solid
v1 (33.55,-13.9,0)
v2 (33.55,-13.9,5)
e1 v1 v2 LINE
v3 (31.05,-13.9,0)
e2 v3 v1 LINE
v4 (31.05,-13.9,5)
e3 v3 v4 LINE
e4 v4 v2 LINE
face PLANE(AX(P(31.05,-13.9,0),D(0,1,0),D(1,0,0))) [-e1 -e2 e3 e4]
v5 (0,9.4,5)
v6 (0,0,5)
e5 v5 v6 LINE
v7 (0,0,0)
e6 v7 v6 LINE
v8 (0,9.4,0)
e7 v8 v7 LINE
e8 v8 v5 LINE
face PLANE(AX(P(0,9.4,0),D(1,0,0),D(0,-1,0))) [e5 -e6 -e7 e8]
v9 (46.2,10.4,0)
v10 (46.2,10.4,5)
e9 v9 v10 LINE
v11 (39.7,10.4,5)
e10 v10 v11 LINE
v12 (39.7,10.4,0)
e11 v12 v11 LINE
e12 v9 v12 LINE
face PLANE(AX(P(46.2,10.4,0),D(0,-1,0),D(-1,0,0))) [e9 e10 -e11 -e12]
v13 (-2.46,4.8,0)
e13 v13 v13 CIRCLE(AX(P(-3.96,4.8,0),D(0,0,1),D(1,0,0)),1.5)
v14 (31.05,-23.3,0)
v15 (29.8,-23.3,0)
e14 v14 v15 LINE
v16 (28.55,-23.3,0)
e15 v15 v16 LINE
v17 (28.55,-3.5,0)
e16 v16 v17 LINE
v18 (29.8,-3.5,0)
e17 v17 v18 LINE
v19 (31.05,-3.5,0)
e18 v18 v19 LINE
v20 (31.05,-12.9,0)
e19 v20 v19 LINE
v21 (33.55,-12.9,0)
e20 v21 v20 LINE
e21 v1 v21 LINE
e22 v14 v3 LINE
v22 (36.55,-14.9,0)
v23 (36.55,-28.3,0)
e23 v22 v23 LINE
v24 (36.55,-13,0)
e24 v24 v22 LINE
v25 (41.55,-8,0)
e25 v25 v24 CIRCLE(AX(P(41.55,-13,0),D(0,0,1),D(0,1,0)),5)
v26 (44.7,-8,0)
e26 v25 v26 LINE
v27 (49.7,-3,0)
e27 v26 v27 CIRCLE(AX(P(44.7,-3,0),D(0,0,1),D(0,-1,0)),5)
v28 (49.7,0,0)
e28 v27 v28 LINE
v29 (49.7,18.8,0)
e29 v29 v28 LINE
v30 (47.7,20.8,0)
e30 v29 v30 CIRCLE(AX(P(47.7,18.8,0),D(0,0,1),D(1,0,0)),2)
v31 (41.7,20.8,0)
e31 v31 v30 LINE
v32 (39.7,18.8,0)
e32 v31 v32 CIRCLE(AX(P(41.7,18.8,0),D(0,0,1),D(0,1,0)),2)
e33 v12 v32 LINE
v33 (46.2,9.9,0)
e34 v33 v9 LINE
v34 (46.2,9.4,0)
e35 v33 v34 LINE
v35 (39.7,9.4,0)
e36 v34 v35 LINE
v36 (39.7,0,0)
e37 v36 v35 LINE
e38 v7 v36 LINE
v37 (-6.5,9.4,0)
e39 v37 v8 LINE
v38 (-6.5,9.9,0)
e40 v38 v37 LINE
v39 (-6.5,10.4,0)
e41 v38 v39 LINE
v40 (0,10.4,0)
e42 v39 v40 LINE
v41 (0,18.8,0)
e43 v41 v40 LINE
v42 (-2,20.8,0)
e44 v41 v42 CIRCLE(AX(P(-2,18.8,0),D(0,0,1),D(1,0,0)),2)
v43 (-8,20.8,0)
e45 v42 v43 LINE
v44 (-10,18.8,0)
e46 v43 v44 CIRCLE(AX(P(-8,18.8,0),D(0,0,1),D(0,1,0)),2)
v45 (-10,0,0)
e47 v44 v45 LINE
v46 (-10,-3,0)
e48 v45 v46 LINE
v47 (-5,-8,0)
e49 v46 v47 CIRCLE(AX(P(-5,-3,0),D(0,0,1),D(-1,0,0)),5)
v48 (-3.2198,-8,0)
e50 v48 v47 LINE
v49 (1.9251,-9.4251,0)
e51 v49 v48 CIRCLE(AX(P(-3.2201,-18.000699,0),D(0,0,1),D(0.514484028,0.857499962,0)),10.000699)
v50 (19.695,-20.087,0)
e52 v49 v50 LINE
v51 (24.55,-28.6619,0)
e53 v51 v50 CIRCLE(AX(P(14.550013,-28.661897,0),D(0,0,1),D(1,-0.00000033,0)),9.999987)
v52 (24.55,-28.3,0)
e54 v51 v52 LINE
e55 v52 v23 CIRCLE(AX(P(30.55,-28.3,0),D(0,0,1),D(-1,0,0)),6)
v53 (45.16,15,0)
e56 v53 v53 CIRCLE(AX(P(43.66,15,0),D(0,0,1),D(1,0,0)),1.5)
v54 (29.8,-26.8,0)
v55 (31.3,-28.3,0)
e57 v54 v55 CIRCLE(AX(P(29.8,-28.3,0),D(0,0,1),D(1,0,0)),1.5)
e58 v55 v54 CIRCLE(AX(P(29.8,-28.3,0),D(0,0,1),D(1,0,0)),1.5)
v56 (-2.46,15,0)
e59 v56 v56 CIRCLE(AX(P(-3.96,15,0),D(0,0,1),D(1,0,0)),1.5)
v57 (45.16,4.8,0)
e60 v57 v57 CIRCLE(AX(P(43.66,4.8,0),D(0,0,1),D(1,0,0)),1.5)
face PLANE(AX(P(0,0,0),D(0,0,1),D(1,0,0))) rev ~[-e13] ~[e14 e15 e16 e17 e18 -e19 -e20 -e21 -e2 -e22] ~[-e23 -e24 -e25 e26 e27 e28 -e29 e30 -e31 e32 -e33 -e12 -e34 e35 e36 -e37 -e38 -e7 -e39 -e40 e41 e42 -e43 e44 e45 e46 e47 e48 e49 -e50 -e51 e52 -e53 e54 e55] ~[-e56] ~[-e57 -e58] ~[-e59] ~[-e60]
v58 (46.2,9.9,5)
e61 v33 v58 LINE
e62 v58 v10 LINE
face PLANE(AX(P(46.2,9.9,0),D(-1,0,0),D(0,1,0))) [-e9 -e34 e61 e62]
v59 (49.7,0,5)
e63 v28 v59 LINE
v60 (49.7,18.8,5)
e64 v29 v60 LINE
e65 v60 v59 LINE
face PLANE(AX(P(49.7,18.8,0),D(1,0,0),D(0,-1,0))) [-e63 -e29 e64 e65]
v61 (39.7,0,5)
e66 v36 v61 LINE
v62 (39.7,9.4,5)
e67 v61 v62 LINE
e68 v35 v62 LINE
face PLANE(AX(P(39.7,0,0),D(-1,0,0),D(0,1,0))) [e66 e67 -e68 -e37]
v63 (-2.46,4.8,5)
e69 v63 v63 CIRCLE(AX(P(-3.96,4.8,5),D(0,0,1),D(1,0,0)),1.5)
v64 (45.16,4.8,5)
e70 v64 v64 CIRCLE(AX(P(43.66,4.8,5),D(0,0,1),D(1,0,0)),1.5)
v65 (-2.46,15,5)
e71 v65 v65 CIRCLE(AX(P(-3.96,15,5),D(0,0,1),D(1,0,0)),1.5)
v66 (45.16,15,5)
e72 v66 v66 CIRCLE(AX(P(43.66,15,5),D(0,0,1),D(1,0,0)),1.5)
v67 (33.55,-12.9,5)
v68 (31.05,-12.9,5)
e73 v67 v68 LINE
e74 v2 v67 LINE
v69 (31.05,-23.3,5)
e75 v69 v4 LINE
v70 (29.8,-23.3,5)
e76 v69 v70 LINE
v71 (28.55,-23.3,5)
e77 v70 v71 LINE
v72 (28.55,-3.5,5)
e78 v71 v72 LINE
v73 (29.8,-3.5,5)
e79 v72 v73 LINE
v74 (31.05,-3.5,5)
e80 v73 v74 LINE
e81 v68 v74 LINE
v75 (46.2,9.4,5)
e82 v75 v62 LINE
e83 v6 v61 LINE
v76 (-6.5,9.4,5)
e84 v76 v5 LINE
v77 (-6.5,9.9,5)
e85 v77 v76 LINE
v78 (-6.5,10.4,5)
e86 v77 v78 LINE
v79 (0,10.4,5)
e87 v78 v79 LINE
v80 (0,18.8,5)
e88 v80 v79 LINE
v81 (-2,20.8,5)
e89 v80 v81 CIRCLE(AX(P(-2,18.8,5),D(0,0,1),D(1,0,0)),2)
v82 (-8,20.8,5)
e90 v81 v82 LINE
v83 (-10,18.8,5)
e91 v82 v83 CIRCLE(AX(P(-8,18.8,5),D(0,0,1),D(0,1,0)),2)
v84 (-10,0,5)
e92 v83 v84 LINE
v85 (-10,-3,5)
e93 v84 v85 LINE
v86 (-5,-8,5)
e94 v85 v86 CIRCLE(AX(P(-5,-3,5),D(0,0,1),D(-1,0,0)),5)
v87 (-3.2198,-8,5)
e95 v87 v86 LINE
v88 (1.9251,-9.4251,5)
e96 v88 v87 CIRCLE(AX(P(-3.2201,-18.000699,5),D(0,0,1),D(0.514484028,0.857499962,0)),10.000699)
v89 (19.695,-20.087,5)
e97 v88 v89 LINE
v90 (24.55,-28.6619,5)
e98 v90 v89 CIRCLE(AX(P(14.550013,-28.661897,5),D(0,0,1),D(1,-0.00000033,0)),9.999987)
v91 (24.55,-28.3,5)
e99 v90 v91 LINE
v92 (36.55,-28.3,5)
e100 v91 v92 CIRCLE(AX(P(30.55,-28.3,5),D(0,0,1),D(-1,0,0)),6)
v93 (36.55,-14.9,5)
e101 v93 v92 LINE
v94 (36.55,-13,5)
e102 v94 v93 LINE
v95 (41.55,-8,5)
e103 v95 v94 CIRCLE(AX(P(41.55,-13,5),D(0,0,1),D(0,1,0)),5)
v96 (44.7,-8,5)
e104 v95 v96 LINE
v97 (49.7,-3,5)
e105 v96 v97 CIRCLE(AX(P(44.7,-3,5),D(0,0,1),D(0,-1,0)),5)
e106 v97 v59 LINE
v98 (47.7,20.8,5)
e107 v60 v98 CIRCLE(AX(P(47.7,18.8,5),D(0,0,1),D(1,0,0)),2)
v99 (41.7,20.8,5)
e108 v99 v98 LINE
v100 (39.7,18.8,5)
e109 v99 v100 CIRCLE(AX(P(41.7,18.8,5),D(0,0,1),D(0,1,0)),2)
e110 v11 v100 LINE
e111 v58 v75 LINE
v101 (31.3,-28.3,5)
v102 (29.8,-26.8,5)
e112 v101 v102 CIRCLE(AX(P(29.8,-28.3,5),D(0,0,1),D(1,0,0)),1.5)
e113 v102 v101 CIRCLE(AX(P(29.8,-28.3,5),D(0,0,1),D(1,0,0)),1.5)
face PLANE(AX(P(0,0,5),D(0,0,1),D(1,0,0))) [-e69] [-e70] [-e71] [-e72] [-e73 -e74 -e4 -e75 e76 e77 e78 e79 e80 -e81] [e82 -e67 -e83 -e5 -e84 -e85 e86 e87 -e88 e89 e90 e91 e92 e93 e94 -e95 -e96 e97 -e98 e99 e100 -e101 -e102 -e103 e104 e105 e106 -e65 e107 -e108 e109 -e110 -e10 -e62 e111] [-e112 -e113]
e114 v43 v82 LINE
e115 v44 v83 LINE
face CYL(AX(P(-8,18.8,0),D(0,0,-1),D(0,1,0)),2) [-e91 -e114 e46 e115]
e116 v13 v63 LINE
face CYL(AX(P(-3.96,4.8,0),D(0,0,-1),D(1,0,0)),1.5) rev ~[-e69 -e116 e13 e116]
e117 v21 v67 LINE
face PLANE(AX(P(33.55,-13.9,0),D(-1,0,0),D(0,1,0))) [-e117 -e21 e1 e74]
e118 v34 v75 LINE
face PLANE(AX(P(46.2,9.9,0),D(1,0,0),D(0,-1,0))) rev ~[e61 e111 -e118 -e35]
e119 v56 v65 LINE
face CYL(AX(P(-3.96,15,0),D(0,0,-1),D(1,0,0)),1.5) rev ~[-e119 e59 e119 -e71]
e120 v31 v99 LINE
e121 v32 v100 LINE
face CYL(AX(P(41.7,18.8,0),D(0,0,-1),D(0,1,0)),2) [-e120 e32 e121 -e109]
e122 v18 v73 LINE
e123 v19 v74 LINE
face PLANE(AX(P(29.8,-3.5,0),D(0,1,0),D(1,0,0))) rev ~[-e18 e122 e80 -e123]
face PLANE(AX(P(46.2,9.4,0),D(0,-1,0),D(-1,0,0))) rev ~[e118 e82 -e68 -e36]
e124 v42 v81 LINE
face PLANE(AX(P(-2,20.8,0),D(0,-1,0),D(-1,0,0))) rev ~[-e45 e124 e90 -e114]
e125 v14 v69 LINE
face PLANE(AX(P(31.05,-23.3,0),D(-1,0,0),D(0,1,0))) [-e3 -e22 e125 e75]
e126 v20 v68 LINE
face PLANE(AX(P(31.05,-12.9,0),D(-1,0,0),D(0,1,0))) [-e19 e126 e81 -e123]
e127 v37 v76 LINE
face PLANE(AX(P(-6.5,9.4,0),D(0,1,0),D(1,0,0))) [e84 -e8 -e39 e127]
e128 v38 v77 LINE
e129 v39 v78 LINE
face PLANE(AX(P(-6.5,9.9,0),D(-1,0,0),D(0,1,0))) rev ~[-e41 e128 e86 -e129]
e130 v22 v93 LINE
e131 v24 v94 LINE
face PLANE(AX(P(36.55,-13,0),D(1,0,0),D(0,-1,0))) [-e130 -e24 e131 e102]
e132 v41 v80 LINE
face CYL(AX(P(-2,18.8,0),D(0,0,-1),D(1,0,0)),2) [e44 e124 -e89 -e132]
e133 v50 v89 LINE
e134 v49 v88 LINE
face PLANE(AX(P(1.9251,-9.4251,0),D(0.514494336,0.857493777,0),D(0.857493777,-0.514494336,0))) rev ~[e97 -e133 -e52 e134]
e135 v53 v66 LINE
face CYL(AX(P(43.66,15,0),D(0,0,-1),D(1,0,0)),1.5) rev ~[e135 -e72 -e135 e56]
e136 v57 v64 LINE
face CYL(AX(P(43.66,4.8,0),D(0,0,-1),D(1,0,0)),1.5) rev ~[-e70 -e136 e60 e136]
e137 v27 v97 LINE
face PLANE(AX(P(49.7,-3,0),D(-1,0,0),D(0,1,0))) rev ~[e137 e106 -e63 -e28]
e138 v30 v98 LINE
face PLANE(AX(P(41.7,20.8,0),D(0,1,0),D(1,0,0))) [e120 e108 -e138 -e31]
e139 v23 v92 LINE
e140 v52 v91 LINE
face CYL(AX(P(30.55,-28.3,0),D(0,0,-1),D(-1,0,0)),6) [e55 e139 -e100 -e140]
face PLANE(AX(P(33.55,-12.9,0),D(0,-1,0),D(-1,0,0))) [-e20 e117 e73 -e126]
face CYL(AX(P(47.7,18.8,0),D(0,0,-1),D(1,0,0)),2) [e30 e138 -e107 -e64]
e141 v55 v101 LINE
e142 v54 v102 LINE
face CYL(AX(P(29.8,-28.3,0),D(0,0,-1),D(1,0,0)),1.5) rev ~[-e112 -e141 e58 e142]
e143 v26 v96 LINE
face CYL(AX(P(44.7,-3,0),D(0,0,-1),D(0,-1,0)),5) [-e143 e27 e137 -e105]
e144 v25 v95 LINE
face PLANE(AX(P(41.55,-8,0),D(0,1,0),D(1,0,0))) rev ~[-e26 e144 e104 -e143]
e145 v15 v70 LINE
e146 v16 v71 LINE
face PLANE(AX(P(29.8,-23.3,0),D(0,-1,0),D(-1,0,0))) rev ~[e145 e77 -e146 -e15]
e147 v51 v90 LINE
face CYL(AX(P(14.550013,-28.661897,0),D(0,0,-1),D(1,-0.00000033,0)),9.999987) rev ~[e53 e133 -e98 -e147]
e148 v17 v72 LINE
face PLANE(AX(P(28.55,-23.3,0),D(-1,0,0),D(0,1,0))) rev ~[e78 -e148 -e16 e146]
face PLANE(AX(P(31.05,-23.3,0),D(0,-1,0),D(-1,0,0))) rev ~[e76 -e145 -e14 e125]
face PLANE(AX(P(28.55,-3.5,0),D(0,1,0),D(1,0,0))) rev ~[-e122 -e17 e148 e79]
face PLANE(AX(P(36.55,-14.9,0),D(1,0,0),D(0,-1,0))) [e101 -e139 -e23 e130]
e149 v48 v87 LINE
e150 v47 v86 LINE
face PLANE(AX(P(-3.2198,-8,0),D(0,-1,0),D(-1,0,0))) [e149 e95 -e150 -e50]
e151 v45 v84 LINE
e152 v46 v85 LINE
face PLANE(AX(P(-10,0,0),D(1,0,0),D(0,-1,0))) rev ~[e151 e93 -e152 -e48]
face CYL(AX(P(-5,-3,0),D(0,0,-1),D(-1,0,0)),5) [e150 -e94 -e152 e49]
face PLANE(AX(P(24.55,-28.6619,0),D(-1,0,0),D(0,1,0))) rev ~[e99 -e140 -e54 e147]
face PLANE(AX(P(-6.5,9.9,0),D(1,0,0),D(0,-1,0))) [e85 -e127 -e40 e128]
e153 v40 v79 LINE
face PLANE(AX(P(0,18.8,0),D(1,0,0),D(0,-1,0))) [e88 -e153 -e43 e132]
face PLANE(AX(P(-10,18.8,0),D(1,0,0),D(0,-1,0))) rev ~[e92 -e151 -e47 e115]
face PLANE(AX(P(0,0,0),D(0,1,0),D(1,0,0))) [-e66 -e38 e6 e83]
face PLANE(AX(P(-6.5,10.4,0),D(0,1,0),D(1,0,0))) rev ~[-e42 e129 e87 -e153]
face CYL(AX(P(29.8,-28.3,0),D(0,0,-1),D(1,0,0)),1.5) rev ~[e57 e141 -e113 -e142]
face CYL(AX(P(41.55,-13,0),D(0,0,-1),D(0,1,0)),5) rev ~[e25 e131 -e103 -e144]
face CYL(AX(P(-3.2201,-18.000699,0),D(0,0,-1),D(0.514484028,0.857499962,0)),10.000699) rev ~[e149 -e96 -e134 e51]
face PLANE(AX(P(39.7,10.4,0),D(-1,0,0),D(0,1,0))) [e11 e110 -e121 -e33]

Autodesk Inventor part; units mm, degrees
ref_plane "YZ Plane" through (0, 0, 0) normal (1, 0, 0) x (0, 1, 0)
ref_plane "XZ Plane" through (0, 0, 0) normal (0, 1, 0) x (-1, 0, 0)
ref_plane "XY Plane" through (0, 0, 0) normal (0, 0, 1) x (1, 0, 0)
sketch "Sketch1" plane through (0, 0, 0) normal (0, 0, 1) x (1, 0, 0)
  line L0 (0, 0) -> (39.7, 0)
  circle A0 centre (43.66, 15) radius 1.5
  circle A1 centre (43.66, 4.8) radius 1.5
  circle A2 centre (-3.96, 15) radius 1.5
  circle A3 centre (-3.96, 4.8) radius 1.5
  line L1 (46.2, 9.9) -> (46.2, 10.4)
  line L2 (46.2, 10.4) -> (39.7, 10.4)
  line L3 (46.2, 9.9) -> (46.2, 9.4)
  line L4 (46.2, 9.4) -> (39.7, 9.4)
  line L5 (39.7, 0) -> (39.7, 9.4)
  line L6 (39.7, 10.4) -> (39.7, 18.8)
  line L7 (-6.5, 9.9) -> (-6.5, 10.4)
  line L8 (-6.5, 10.4) -> (0, 10.4)
  line L9 (-6.5, 9.4) -> (0, 9.4)
  line L10 (-6.5, 9.9) -> (-6.5, 9.4)
  line L11 (0, 9.4) -> (0, 0)
  line L12 (29.8, -3.5) -> (31.05, -3.5)
  line L13 (31.05, -23.3) -> (28.55, -23.3)
  line L14 (28.55, -23.3) -> (28.55, -3.5)
  line L15 (28.55, -3.5) -> (29.8, -3.5)
  line L16 (29.8, -23.3) -> (29.8, -28.3)
  circle A4 centre (29.8, -28.3) radius 1.5
  line L17 (31.05, -23.3) -> (31.05, -13.9)
  line L18 (31.05, -13.9) -> (33.55, -13.9)
  line L19 (33.55, -13.9) -> (33.55, -12.9)
  line L20 (33.55, -12.9) -> (31.05, -12.9)
  line L21 (31.05, -12.9) -> (31.05, -3.5)
  line L22 (36.55, -14.9) -> (36.55, -28.3)
  line L23 (-10, 0) -> (-10, -3)
  line L24 (36.55, -13) -> (36.55, -14.9)
  line L25 (41.55, -8) -> (44.7, -8)
  line L26 (49.7, -3) -> (49.7, 0)
  arc A5 (24.55, -28.3) -> (36.55, -28.3) centre (30.55, -28.3) ccw
  arc A6 (44.7, -8) -> (49.7, -3) centre (44.7, -3) ccw
  arc A7 (-10, -3) -> (-5, -8) centre (-5, -3) ccw
  arc A8 (41.55, -8) -> (36.55, -13) centre (41.55, -13) ccw
  line L27 (24.55, -28.6619) -> (24.55, -28.3)
  line L28 (-3.2198, -8) -> (-5, -8)
  line L29 (1.9251, -9.4251) -> (19.695, -20.087)
  arc A9 (1.9251, -9.4251) -> (-3.2198, -8) centre (-3.2198, -18) ccw
  arc A10 (24.55, -28.6619) -> (19.695, -20.087) centre (14.55, -28.6619) ccw
  line L30 (-2, 20.8) -> (-8, 20.8)
  line L31 (-10, 18.8) -> (-10, 0)
  line L32 (41.7, 20.8) -> (47.7, 20.8)
  line L33 (49.7, 18.8) -> (49.7, 0)
  arc A11 (0, 18.8) -> (-2, 20.8) centre (-2, 18.8) ccw
  arc A12 (-8, 20.8) -> (-10, 18.8) centre (-8, 18.8) ccw
  arc A13 (41.7, 20.8) -> (39.7, 18.8) centre (41.7, 18.8) ccw
  arc A14 (49.7, 18.8) -> (47.7, 20.8) centre (47.7, 18.8) ccw
  line L34 (0, 18.8) -> (0, 10.4)
  point P0 (0, 20.8)
  point P1 (-10, 20.8)
  dimension "d13" = 1.25
  dimension "d15" = 2.5
  dimension "d16" = 19.8
  dimension "d17" = 5
  dimension "d25" = 9.4
  dimension "d26" = 2.5
  dimension "d27" = 1
  dimension "d28" = 1
  dimension "d29" = 1
  dimension "d30" = 6.5
  dimension "d48" = 5
  dimension "d54" = 10
  dimension "d57" = 10
  dimension "d58" = 2
extrude "Extrusion1" add sketch "Sketch1" along normal blind 5
properties part number "braket atas 2"
